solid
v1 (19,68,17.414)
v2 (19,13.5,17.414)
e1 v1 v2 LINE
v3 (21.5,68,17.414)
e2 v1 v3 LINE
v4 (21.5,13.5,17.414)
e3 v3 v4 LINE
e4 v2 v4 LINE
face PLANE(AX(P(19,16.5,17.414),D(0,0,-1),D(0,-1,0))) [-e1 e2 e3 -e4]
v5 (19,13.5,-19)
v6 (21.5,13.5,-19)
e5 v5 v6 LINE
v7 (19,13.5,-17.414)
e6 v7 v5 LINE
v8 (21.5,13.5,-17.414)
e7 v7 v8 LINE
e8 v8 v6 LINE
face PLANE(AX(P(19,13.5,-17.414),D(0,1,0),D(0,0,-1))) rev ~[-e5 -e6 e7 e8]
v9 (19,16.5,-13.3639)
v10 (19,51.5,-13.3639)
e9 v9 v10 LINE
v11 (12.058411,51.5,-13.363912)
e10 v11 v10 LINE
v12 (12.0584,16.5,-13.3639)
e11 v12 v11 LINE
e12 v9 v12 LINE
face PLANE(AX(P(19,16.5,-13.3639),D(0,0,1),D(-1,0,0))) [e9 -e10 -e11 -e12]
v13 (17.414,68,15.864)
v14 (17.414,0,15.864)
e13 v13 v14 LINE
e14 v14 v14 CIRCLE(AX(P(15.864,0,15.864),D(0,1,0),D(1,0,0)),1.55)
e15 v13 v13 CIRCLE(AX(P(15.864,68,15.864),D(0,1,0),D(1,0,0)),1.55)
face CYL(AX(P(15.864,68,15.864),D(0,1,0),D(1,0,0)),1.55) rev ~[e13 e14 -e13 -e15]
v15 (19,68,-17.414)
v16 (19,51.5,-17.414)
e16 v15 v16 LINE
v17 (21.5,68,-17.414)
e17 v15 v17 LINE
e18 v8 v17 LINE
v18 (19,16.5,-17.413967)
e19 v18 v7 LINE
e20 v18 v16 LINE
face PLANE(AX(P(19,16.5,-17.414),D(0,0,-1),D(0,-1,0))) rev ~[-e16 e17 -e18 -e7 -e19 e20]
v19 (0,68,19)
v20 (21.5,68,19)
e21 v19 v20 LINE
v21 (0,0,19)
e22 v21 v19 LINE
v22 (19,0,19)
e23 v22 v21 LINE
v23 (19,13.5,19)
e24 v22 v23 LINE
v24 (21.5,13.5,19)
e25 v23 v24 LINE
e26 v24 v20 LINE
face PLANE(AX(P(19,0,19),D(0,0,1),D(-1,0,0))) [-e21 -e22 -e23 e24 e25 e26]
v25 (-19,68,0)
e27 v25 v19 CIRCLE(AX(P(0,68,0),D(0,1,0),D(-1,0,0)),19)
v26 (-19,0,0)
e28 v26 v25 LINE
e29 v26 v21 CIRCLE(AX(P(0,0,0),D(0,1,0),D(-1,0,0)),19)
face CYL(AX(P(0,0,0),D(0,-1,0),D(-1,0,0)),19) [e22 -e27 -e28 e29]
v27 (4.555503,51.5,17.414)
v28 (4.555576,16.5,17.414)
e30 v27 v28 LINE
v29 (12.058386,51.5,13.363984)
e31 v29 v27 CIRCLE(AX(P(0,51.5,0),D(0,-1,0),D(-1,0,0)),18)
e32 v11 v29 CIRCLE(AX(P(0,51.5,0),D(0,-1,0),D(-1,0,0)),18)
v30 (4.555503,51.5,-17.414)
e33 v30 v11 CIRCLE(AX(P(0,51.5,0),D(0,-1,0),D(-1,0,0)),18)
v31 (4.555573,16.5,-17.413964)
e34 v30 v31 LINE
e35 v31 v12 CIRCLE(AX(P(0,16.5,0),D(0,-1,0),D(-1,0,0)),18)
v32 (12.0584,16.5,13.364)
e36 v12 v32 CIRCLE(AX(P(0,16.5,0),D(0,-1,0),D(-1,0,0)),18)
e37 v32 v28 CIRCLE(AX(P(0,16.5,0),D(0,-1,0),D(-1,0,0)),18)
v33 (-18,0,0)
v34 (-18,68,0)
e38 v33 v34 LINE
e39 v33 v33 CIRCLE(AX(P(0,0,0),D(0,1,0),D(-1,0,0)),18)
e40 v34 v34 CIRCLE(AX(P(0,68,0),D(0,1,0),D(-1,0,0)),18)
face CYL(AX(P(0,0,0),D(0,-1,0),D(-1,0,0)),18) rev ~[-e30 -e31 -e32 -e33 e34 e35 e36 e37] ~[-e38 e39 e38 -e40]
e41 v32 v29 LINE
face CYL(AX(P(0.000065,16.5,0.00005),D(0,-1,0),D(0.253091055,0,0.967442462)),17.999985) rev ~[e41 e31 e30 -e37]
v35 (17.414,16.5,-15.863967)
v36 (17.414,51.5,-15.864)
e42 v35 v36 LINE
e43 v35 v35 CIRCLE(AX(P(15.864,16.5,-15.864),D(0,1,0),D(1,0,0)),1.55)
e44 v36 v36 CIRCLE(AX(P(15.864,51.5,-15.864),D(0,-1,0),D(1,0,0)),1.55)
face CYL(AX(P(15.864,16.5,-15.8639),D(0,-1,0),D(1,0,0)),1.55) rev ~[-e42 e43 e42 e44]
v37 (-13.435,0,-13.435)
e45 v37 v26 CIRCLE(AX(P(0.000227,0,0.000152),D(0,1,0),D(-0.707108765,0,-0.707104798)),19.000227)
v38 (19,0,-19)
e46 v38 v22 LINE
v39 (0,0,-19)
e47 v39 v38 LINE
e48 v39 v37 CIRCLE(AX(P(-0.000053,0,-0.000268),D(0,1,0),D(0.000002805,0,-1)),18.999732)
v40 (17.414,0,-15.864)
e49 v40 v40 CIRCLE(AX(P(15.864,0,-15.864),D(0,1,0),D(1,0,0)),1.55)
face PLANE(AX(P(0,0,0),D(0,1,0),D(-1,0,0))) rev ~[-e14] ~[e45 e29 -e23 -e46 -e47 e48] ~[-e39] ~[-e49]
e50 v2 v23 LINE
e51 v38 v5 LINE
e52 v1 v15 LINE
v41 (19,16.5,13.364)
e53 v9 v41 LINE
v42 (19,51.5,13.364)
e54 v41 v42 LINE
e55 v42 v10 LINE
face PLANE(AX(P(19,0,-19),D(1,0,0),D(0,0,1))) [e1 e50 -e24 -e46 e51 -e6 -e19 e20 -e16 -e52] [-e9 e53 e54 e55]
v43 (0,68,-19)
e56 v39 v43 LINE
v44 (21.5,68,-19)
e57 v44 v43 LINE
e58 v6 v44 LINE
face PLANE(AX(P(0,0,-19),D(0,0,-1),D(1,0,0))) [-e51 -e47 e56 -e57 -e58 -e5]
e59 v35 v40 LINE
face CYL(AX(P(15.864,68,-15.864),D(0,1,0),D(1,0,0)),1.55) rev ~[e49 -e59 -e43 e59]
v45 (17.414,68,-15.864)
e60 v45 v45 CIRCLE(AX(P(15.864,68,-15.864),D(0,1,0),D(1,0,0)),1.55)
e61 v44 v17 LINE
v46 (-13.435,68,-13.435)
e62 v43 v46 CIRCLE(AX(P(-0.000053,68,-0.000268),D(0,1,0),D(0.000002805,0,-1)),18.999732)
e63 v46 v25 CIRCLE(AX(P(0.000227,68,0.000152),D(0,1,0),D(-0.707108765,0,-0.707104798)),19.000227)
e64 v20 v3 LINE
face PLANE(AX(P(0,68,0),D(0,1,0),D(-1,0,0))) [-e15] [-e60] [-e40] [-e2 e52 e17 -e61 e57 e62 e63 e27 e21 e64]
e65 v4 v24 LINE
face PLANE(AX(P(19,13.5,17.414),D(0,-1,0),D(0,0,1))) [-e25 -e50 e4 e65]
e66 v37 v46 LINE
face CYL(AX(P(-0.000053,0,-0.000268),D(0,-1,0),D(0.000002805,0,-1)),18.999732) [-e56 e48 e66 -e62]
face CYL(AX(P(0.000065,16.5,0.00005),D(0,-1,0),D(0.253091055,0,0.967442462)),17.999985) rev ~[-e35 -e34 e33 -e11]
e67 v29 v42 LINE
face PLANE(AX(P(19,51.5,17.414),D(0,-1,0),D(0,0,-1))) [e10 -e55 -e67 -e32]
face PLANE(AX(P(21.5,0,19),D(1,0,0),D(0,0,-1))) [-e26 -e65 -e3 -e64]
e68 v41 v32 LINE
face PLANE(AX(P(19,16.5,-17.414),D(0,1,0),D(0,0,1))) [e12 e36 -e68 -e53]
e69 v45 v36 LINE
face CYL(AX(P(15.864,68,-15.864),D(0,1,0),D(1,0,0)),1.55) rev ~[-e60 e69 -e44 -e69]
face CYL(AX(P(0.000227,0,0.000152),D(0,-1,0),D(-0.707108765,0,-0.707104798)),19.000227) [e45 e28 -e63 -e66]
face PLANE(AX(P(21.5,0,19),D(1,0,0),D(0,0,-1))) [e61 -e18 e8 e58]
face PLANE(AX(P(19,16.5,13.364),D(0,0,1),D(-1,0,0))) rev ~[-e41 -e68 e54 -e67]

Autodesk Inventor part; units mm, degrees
ref_plane "YZ Plane" through (0, 0, 0) normal (1, 0, 0) x (0, 1, 0)
ref_plane "XZ Plane" through (0, 0, 0) normal (0, 1, 0) x (-1, 0, 0)
sketch "Sketch1" plane through (0, 0, 0) normal (0, 1, 0) x (-1, 0, 0)
  circle A0 centre (0, 0) radius 18
  arc A1 (19, 0) -> (0, -19) centre (0, 0) ccw
  line L0 (19, -19) -> (0, -19) construction
  line L1 (-19, -19) -> (-19, 19)
  line L2 (-19, 19) -> (0, 19)
  line L3 (19, 19) -> (19, 0) construction
  line L4 (19, -19) -> (-19, 19) construction
  line L5 (-19, -19) -> (19, 19) construction
  line L6 (0, -19) -> (-19, -19)
  line L7 (19, 0) -> (19, -19) construction
  arc A2 (13.435, -13.435) -> (19, 0) centre (0, 0) ccw
  arc A3 (0, -19) -> (13.435, -13.435) centre (0, 0) ccw
  line L8 (0, 19) -> (19, 19) construction
  dimension "d0" = 36
  dimension "d1" = 38
extrude "Extrusion1" add sketch "Sketch1" along normal blind 68
ref_plane "Work Plane2" through (0, 34, 0) normal (0, -1, 0) x (1, 0, 0)
sketch "Sketch10" plane through (0, 68, 0) normal (0, 1, 0) x (1, 0, 0)
  line L0 (19, -19) -> (19, 19) projected
  line L1 (19, 19) -> (12.7279, 12.7279) construction
  circle A0 centre (0, 0) radius 18 projected
  line L2 (0, -19) -> (19, -19) projected
  line L3 (19, -19) -> (12.7279, -12.7279) construction
  circle A1 centre (15.864, 15.864) radius 1.55
  circle A2 centre (15.864, -15.864) radius 1.55
  dimension "d21" = 3.1
  dimension "d22" = 3.1
extrude "Extrusion5" cut sketch "Sketch10" against normal through all contours A1 | A2
sketch "Sketch11" plane through (19, 0, 19) normal (1, 0, 0) x (0, 0, -1)
  line L0 (0, 68) -> (38, 68) projected
  line L1 (0, 0) -> (38, 0) projected
  line L2 (0, 68) -> (38, 0) construction
  line L3 (38, 68) -> (0, 0) construction
  line L4 (36.414, 68) -> (36.414, 0) projected
  line L5 (1.586, 51.5) -> (36.414, 51.5)
  line L6 (36.414, 51.5) -> (36.414, 16.5)
  line L7 (36.414, 16.5) -> (1.586, 16.5)
  line L8 (1.586, 16.5) -> (1.586, 51.5)
  line L9 (1.586, 51.5) -> (36.414, 16.5) construction
  line L10 (36.414, 51.5) -> (1.586, 16.5) construction
  point P0 (19, 0)
  point P1 (19, 34)
  dimension "d25" = 35
extrude "Extrusion6" cut sketch "Sketch11" against normal up to next
sketch "Sketch12" plane through (19, 0, 19) normal (1, 0, 0) x (0, 0, -1)
  line L0 (38, 0) -> (38, 68) projected
  line L1 (36.414, 16.5) -> (36.414, 0) projected
  line L2 (38, 68) -> (36.414, 68)
  line L3 (36.414, 68) -> (36.414, 13.5)
  line L4 (36.414, 13.5) -> (38, 13.5)
  line L5 (38, 13.5) -> (38, 68)
  line L6 (1.586, 16.5) -> (1.586, 0) projected
  line L7 (0, 68) -> (1.586, 68)
  line L8 (1.586, 68) -> (1.586, 13.5)
  line L9 (1.586, 13.5) -> (0, 13.5)
  line L10 (0, 13.5) -> (0, 68)
  point P0 (38, 13.5)
  dimension "d33" = 54.5
extrude "Extrusion7" add sketch "Sketch12" along normal blind 2.5
sketch "Sketch13" plane through (19, 16.5, 17.414) normal (0, 1, 0) x (1, 0, 0)
  line L0 (0, 34.8279) -> (0, 0) projected
  line L1 (0, 34.8279) -> (-3.136, 34.8279) projected
  line L2 (-3.136, 34.8279) -> (-14.4443, 34.8279) projected
  arc A0 (-14.4443, 0) -> (-14.4443, 34.8279) centre (-19, 17.414) ccw projected
  circle A1 centre (-3.136, 33.2779) radius 1.55 projected
  circle A2 centre (-3.136, 33.2779) radius 1.55
  circle A3 centre (-3.136, 33.2779) radius 2.5 construction
  line L3 (0, 30.7779) -> (-6.9416, 30.7779)
  circle A4 centre (-19, 17.414) radius 18
  line L4 (0, 34.8279) -> (-14.4443, 34.8279)
  line L5 (0, 34.8279) -> (0, 30.7779)
  line L6 (-19, 17.414) -> (-15.9745, 17.414) construction
  line L7 (0, 0) -> (-3.136, 0)
  line L8 (-3.136, 0) -> (-14.4443, 0)
  circle A5 centre (-3.136, 1.55) radius 1.55
  circle A6 centre (-3.136, 1.55) radius 1.55
  circle A7 centre (-3.136, 1.55) radius 2.5 construction
  line L9 (0, 4.05) -> (-6.9416, 4.05)
  line L10 (0, 0) -> (-14.4443, 0)
  line L11 (0, 0) -> (0, 4.05)
  point P0 (0, 4.05)
  point P1 (-6.9416, 4.05)
  dimension "d30" = 5
extrude "Extrusion8" add sketch "Sketch13" along normal up to next contours L0 L3 A0 L2 L1 | L0 L7 L8 A0 L9
properties part number "Tubo" material "ABS Plastic"
